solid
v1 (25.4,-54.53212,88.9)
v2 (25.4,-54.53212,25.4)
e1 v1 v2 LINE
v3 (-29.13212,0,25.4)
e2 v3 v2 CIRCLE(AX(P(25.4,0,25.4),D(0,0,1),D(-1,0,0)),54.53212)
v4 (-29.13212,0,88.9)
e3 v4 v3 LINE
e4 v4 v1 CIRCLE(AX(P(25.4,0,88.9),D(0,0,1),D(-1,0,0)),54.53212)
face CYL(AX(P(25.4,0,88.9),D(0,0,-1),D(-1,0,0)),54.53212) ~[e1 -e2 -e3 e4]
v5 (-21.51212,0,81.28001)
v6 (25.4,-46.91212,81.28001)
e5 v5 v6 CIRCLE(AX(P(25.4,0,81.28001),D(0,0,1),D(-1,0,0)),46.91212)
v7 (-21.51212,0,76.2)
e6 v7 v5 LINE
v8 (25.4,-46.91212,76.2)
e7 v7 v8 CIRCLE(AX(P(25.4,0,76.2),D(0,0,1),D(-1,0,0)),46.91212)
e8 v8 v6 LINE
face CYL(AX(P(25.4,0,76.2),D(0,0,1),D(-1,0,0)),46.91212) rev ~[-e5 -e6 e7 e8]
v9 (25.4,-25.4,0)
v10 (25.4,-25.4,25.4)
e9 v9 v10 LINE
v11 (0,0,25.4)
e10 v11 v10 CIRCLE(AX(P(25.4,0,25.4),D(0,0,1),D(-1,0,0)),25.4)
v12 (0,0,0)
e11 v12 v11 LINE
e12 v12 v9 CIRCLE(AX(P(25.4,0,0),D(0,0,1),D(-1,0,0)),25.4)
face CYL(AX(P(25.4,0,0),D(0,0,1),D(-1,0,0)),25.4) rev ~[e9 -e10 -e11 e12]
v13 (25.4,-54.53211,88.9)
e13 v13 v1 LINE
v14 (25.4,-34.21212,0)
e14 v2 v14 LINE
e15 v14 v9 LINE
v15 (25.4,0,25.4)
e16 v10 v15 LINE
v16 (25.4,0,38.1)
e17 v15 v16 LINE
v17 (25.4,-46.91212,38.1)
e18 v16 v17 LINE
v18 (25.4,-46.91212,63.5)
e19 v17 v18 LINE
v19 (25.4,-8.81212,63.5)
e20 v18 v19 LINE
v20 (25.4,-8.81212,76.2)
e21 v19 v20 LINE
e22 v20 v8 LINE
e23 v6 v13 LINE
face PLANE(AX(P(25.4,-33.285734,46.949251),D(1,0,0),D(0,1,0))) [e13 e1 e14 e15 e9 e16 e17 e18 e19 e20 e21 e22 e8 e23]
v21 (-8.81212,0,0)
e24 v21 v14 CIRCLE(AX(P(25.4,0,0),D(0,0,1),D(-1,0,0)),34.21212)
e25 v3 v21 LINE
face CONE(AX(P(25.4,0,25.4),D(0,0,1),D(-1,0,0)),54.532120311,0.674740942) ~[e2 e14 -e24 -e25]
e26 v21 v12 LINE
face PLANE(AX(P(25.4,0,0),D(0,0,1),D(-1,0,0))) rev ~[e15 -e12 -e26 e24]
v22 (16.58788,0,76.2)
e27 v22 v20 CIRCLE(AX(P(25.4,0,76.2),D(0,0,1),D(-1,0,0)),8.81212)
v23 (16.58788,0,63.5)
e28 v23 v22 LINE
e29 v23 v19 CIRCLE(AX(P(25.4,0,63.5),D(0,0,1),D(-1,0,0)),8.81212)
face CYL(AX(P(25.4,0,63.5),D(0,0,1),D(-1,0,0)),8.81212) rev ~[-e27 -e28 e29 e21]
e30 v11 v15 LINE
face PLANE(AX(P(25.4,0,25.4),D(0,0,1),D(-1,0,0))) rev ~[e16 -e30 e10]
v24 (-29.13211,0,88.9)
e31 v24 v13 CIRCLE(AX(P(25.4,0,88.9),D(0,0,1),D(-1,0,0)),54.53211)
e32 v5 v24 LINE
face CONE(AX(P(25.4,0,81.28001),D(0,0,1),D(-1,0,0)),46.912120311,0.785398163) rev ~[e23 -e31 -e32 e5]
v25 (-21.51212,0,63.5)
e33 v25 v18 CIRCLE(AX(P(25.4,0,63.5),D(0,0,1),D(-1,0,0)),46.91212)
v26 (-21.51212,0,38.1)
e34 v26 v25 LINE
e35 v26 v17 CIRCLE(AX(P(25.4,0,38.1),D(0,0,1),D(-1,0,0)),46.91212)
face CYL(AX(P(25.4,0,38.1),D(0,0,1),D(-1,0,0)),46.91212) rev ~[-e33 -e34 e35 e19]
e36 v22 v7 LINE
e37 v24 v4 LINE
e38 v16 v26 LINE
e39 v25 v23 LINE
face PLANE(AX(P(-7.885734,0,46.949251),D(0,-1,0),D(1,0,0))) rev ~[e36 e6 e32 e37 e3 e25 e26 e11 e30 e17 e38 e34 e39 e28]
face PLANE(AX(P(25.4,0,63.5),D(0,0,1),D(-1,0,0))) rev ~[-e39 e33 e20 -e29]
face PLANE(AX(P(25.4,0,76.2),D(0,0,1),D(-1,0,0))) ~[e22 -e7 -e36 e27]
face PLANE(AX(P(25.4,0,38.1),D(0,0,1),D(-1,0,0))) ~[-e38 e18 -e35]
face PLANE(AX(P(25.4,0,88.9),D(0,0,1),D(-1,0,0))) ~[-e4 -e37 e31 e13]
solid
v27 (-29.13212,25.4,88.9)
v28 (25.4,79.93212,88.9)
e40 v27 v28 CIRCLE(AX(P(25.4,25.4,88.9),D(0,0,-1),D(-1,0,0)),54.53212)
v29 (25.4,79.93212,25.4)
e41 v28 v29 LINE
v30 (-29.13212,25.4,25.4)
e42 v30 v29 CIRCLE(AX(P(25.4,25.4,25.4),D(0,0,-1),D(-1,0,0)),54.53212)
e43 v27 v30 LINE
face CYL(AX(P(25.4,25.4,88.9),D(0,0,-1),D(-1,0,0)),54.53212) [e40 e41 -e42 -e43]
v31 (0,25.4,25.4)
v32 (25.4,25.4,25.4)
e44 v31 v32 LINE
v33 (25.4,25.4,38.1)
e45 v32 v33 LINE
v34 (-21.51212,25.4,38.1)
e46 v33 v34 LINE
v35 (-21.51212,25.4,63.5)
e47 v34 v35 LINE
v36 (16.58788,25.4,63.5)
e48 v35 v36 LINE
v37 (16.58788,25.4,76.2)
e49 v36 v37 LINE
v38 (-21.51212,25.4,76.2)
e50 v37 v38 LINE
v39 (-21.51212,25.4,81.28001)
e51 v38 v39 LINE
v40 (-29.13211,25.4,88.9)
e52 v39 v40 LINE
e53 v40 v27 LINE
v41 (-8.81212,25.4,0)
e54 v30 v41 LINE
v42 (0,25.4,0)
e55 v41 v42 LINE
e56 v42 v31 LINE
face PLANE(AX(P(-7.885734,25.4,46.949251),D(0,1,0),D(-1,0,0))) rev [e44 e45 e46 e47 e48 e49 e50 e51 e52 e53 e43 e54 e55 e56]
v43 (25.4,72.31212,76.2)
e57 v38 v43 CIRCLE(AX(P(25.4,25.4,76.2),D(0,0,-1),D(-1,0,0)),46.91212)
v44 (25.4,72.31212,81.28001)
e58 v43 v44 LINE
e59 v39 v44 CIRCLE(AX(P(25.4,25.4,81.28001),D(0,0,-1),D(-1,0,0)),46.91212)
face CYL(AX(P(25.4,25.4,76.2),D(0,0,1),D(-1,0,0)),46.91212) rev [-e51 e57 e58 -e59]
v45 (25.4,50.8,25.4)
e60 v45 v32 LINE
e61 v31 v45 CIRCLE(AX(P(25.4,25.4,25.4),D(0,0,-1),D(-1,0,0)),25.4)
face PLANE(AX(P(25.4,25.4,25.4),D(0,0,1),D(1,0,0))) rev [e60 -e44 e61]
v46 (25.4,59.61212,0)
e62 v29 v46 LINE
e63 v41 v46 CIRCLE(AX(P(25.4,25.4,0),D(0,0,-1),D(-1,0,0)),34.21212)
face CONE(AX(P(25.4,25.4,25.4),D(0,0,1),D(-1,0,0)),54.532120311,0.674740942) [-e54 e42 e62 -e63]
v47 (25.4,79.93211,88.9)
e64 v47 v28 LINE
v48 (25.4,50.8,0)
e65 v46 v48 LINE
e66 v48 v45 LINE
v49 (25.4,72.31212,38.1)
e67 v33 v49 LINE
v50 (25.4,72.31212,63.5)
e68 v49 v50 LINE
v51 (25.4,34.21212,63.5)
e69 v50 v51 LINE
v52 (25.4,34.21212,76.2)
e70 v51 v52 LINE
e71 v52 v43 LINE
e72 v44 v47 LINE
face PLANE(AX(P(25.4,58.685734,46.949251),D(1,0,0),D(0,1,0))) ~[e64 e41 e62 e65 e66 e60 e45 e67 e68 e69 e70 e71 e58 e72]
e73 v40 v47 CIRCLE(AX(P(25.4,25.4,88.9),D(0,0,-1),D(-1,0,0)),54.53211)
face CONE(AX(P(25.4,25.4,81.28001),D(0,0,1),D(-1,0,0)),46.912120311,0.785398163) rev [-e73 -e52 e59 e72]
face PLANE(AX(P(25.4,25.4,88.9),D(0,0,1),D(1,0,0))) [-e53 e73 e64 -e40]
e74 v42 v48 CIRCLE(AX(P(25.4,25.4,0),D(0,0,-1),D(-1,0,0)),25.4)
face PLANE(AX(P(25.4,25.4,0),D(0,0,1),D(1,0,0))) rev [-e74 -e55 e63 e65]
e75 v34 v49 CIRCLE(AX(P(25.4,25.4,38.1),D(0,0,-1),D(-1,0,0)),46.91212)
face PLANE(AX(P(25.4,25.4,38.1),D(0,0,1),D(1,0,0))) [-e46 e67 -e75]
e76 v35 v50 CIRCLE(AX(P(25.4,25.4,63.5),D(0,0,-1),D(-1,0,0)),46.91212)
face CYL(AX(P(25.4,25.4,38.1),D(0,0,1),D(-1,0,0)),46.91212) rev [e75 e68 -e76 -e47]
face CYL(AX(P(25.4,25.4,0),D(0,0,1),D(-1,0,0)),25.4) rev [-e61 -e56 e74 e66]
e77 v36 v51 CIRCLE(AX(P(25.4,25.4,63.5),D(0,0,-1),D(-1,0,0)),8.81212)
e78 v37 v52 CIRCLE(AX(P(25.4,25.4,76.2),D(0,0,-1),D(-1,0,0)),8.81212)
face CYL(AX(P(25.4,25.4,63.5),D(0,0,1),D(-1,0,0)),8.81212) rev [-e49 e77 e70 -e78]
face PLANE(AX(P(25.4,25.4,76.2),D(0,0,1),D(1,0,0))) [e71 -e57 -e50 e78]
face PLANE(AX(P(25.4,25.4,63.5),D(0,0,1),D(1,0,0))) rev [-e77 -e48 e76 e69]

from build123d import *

# Parameters (mm, degrees)
F1_ANGLE = 90
F2_SIZE  = 7.61999


# Not quite as in the source:
# - a fillet or chamfer is up to 0.001 mm smaller than in the source, because OpenCascade refuses the exact size


with BuildPart() as f1:
    # F0 (on Front) → F1 (revolve)
    with BuildSketch(Plane.XZ):
        Polygon((-8.8121203113, 0), (0, 0), (0, 25.4), (25.4, 25.4), (25.4, 38.1), (-21.5121203113, 38.1), (-21.5121203113, 63.5), (16.5878796887, 63.5), (16.5878796887, 76.2), (-21.5121203113, 76.2), (-21.5121203113, 88.9), (-29.1321203113, 88.9), (-29.1321203113, 25.4), align=None)
    revolve(axis=Axis((25.4, 0, 31.75), (0, 0, 1)), revolution_arc=F1_ANGLE)

    # F2 (size 7.62 in the source; OpenCascade refuses exactly that, so slightly less here)
    f2_edges = [f1.edges().sort_by_distance(p)[0] for p in [
        (-7.771878, -33.171878, 88.9),
    ]]
    chamfer(f2_edges, length=F2_SIZE)


with BuildPart() as f4_1:
    # F4: instance of F1
    add(f1.part.mirror(Plane(origin=(-8.2304534557, 12.7, 42.1908362941), x_dir=(-1, 0, 0), z_dir=(0, 1, 0))))


solid = Compound([f1.part, f4_1.part])
